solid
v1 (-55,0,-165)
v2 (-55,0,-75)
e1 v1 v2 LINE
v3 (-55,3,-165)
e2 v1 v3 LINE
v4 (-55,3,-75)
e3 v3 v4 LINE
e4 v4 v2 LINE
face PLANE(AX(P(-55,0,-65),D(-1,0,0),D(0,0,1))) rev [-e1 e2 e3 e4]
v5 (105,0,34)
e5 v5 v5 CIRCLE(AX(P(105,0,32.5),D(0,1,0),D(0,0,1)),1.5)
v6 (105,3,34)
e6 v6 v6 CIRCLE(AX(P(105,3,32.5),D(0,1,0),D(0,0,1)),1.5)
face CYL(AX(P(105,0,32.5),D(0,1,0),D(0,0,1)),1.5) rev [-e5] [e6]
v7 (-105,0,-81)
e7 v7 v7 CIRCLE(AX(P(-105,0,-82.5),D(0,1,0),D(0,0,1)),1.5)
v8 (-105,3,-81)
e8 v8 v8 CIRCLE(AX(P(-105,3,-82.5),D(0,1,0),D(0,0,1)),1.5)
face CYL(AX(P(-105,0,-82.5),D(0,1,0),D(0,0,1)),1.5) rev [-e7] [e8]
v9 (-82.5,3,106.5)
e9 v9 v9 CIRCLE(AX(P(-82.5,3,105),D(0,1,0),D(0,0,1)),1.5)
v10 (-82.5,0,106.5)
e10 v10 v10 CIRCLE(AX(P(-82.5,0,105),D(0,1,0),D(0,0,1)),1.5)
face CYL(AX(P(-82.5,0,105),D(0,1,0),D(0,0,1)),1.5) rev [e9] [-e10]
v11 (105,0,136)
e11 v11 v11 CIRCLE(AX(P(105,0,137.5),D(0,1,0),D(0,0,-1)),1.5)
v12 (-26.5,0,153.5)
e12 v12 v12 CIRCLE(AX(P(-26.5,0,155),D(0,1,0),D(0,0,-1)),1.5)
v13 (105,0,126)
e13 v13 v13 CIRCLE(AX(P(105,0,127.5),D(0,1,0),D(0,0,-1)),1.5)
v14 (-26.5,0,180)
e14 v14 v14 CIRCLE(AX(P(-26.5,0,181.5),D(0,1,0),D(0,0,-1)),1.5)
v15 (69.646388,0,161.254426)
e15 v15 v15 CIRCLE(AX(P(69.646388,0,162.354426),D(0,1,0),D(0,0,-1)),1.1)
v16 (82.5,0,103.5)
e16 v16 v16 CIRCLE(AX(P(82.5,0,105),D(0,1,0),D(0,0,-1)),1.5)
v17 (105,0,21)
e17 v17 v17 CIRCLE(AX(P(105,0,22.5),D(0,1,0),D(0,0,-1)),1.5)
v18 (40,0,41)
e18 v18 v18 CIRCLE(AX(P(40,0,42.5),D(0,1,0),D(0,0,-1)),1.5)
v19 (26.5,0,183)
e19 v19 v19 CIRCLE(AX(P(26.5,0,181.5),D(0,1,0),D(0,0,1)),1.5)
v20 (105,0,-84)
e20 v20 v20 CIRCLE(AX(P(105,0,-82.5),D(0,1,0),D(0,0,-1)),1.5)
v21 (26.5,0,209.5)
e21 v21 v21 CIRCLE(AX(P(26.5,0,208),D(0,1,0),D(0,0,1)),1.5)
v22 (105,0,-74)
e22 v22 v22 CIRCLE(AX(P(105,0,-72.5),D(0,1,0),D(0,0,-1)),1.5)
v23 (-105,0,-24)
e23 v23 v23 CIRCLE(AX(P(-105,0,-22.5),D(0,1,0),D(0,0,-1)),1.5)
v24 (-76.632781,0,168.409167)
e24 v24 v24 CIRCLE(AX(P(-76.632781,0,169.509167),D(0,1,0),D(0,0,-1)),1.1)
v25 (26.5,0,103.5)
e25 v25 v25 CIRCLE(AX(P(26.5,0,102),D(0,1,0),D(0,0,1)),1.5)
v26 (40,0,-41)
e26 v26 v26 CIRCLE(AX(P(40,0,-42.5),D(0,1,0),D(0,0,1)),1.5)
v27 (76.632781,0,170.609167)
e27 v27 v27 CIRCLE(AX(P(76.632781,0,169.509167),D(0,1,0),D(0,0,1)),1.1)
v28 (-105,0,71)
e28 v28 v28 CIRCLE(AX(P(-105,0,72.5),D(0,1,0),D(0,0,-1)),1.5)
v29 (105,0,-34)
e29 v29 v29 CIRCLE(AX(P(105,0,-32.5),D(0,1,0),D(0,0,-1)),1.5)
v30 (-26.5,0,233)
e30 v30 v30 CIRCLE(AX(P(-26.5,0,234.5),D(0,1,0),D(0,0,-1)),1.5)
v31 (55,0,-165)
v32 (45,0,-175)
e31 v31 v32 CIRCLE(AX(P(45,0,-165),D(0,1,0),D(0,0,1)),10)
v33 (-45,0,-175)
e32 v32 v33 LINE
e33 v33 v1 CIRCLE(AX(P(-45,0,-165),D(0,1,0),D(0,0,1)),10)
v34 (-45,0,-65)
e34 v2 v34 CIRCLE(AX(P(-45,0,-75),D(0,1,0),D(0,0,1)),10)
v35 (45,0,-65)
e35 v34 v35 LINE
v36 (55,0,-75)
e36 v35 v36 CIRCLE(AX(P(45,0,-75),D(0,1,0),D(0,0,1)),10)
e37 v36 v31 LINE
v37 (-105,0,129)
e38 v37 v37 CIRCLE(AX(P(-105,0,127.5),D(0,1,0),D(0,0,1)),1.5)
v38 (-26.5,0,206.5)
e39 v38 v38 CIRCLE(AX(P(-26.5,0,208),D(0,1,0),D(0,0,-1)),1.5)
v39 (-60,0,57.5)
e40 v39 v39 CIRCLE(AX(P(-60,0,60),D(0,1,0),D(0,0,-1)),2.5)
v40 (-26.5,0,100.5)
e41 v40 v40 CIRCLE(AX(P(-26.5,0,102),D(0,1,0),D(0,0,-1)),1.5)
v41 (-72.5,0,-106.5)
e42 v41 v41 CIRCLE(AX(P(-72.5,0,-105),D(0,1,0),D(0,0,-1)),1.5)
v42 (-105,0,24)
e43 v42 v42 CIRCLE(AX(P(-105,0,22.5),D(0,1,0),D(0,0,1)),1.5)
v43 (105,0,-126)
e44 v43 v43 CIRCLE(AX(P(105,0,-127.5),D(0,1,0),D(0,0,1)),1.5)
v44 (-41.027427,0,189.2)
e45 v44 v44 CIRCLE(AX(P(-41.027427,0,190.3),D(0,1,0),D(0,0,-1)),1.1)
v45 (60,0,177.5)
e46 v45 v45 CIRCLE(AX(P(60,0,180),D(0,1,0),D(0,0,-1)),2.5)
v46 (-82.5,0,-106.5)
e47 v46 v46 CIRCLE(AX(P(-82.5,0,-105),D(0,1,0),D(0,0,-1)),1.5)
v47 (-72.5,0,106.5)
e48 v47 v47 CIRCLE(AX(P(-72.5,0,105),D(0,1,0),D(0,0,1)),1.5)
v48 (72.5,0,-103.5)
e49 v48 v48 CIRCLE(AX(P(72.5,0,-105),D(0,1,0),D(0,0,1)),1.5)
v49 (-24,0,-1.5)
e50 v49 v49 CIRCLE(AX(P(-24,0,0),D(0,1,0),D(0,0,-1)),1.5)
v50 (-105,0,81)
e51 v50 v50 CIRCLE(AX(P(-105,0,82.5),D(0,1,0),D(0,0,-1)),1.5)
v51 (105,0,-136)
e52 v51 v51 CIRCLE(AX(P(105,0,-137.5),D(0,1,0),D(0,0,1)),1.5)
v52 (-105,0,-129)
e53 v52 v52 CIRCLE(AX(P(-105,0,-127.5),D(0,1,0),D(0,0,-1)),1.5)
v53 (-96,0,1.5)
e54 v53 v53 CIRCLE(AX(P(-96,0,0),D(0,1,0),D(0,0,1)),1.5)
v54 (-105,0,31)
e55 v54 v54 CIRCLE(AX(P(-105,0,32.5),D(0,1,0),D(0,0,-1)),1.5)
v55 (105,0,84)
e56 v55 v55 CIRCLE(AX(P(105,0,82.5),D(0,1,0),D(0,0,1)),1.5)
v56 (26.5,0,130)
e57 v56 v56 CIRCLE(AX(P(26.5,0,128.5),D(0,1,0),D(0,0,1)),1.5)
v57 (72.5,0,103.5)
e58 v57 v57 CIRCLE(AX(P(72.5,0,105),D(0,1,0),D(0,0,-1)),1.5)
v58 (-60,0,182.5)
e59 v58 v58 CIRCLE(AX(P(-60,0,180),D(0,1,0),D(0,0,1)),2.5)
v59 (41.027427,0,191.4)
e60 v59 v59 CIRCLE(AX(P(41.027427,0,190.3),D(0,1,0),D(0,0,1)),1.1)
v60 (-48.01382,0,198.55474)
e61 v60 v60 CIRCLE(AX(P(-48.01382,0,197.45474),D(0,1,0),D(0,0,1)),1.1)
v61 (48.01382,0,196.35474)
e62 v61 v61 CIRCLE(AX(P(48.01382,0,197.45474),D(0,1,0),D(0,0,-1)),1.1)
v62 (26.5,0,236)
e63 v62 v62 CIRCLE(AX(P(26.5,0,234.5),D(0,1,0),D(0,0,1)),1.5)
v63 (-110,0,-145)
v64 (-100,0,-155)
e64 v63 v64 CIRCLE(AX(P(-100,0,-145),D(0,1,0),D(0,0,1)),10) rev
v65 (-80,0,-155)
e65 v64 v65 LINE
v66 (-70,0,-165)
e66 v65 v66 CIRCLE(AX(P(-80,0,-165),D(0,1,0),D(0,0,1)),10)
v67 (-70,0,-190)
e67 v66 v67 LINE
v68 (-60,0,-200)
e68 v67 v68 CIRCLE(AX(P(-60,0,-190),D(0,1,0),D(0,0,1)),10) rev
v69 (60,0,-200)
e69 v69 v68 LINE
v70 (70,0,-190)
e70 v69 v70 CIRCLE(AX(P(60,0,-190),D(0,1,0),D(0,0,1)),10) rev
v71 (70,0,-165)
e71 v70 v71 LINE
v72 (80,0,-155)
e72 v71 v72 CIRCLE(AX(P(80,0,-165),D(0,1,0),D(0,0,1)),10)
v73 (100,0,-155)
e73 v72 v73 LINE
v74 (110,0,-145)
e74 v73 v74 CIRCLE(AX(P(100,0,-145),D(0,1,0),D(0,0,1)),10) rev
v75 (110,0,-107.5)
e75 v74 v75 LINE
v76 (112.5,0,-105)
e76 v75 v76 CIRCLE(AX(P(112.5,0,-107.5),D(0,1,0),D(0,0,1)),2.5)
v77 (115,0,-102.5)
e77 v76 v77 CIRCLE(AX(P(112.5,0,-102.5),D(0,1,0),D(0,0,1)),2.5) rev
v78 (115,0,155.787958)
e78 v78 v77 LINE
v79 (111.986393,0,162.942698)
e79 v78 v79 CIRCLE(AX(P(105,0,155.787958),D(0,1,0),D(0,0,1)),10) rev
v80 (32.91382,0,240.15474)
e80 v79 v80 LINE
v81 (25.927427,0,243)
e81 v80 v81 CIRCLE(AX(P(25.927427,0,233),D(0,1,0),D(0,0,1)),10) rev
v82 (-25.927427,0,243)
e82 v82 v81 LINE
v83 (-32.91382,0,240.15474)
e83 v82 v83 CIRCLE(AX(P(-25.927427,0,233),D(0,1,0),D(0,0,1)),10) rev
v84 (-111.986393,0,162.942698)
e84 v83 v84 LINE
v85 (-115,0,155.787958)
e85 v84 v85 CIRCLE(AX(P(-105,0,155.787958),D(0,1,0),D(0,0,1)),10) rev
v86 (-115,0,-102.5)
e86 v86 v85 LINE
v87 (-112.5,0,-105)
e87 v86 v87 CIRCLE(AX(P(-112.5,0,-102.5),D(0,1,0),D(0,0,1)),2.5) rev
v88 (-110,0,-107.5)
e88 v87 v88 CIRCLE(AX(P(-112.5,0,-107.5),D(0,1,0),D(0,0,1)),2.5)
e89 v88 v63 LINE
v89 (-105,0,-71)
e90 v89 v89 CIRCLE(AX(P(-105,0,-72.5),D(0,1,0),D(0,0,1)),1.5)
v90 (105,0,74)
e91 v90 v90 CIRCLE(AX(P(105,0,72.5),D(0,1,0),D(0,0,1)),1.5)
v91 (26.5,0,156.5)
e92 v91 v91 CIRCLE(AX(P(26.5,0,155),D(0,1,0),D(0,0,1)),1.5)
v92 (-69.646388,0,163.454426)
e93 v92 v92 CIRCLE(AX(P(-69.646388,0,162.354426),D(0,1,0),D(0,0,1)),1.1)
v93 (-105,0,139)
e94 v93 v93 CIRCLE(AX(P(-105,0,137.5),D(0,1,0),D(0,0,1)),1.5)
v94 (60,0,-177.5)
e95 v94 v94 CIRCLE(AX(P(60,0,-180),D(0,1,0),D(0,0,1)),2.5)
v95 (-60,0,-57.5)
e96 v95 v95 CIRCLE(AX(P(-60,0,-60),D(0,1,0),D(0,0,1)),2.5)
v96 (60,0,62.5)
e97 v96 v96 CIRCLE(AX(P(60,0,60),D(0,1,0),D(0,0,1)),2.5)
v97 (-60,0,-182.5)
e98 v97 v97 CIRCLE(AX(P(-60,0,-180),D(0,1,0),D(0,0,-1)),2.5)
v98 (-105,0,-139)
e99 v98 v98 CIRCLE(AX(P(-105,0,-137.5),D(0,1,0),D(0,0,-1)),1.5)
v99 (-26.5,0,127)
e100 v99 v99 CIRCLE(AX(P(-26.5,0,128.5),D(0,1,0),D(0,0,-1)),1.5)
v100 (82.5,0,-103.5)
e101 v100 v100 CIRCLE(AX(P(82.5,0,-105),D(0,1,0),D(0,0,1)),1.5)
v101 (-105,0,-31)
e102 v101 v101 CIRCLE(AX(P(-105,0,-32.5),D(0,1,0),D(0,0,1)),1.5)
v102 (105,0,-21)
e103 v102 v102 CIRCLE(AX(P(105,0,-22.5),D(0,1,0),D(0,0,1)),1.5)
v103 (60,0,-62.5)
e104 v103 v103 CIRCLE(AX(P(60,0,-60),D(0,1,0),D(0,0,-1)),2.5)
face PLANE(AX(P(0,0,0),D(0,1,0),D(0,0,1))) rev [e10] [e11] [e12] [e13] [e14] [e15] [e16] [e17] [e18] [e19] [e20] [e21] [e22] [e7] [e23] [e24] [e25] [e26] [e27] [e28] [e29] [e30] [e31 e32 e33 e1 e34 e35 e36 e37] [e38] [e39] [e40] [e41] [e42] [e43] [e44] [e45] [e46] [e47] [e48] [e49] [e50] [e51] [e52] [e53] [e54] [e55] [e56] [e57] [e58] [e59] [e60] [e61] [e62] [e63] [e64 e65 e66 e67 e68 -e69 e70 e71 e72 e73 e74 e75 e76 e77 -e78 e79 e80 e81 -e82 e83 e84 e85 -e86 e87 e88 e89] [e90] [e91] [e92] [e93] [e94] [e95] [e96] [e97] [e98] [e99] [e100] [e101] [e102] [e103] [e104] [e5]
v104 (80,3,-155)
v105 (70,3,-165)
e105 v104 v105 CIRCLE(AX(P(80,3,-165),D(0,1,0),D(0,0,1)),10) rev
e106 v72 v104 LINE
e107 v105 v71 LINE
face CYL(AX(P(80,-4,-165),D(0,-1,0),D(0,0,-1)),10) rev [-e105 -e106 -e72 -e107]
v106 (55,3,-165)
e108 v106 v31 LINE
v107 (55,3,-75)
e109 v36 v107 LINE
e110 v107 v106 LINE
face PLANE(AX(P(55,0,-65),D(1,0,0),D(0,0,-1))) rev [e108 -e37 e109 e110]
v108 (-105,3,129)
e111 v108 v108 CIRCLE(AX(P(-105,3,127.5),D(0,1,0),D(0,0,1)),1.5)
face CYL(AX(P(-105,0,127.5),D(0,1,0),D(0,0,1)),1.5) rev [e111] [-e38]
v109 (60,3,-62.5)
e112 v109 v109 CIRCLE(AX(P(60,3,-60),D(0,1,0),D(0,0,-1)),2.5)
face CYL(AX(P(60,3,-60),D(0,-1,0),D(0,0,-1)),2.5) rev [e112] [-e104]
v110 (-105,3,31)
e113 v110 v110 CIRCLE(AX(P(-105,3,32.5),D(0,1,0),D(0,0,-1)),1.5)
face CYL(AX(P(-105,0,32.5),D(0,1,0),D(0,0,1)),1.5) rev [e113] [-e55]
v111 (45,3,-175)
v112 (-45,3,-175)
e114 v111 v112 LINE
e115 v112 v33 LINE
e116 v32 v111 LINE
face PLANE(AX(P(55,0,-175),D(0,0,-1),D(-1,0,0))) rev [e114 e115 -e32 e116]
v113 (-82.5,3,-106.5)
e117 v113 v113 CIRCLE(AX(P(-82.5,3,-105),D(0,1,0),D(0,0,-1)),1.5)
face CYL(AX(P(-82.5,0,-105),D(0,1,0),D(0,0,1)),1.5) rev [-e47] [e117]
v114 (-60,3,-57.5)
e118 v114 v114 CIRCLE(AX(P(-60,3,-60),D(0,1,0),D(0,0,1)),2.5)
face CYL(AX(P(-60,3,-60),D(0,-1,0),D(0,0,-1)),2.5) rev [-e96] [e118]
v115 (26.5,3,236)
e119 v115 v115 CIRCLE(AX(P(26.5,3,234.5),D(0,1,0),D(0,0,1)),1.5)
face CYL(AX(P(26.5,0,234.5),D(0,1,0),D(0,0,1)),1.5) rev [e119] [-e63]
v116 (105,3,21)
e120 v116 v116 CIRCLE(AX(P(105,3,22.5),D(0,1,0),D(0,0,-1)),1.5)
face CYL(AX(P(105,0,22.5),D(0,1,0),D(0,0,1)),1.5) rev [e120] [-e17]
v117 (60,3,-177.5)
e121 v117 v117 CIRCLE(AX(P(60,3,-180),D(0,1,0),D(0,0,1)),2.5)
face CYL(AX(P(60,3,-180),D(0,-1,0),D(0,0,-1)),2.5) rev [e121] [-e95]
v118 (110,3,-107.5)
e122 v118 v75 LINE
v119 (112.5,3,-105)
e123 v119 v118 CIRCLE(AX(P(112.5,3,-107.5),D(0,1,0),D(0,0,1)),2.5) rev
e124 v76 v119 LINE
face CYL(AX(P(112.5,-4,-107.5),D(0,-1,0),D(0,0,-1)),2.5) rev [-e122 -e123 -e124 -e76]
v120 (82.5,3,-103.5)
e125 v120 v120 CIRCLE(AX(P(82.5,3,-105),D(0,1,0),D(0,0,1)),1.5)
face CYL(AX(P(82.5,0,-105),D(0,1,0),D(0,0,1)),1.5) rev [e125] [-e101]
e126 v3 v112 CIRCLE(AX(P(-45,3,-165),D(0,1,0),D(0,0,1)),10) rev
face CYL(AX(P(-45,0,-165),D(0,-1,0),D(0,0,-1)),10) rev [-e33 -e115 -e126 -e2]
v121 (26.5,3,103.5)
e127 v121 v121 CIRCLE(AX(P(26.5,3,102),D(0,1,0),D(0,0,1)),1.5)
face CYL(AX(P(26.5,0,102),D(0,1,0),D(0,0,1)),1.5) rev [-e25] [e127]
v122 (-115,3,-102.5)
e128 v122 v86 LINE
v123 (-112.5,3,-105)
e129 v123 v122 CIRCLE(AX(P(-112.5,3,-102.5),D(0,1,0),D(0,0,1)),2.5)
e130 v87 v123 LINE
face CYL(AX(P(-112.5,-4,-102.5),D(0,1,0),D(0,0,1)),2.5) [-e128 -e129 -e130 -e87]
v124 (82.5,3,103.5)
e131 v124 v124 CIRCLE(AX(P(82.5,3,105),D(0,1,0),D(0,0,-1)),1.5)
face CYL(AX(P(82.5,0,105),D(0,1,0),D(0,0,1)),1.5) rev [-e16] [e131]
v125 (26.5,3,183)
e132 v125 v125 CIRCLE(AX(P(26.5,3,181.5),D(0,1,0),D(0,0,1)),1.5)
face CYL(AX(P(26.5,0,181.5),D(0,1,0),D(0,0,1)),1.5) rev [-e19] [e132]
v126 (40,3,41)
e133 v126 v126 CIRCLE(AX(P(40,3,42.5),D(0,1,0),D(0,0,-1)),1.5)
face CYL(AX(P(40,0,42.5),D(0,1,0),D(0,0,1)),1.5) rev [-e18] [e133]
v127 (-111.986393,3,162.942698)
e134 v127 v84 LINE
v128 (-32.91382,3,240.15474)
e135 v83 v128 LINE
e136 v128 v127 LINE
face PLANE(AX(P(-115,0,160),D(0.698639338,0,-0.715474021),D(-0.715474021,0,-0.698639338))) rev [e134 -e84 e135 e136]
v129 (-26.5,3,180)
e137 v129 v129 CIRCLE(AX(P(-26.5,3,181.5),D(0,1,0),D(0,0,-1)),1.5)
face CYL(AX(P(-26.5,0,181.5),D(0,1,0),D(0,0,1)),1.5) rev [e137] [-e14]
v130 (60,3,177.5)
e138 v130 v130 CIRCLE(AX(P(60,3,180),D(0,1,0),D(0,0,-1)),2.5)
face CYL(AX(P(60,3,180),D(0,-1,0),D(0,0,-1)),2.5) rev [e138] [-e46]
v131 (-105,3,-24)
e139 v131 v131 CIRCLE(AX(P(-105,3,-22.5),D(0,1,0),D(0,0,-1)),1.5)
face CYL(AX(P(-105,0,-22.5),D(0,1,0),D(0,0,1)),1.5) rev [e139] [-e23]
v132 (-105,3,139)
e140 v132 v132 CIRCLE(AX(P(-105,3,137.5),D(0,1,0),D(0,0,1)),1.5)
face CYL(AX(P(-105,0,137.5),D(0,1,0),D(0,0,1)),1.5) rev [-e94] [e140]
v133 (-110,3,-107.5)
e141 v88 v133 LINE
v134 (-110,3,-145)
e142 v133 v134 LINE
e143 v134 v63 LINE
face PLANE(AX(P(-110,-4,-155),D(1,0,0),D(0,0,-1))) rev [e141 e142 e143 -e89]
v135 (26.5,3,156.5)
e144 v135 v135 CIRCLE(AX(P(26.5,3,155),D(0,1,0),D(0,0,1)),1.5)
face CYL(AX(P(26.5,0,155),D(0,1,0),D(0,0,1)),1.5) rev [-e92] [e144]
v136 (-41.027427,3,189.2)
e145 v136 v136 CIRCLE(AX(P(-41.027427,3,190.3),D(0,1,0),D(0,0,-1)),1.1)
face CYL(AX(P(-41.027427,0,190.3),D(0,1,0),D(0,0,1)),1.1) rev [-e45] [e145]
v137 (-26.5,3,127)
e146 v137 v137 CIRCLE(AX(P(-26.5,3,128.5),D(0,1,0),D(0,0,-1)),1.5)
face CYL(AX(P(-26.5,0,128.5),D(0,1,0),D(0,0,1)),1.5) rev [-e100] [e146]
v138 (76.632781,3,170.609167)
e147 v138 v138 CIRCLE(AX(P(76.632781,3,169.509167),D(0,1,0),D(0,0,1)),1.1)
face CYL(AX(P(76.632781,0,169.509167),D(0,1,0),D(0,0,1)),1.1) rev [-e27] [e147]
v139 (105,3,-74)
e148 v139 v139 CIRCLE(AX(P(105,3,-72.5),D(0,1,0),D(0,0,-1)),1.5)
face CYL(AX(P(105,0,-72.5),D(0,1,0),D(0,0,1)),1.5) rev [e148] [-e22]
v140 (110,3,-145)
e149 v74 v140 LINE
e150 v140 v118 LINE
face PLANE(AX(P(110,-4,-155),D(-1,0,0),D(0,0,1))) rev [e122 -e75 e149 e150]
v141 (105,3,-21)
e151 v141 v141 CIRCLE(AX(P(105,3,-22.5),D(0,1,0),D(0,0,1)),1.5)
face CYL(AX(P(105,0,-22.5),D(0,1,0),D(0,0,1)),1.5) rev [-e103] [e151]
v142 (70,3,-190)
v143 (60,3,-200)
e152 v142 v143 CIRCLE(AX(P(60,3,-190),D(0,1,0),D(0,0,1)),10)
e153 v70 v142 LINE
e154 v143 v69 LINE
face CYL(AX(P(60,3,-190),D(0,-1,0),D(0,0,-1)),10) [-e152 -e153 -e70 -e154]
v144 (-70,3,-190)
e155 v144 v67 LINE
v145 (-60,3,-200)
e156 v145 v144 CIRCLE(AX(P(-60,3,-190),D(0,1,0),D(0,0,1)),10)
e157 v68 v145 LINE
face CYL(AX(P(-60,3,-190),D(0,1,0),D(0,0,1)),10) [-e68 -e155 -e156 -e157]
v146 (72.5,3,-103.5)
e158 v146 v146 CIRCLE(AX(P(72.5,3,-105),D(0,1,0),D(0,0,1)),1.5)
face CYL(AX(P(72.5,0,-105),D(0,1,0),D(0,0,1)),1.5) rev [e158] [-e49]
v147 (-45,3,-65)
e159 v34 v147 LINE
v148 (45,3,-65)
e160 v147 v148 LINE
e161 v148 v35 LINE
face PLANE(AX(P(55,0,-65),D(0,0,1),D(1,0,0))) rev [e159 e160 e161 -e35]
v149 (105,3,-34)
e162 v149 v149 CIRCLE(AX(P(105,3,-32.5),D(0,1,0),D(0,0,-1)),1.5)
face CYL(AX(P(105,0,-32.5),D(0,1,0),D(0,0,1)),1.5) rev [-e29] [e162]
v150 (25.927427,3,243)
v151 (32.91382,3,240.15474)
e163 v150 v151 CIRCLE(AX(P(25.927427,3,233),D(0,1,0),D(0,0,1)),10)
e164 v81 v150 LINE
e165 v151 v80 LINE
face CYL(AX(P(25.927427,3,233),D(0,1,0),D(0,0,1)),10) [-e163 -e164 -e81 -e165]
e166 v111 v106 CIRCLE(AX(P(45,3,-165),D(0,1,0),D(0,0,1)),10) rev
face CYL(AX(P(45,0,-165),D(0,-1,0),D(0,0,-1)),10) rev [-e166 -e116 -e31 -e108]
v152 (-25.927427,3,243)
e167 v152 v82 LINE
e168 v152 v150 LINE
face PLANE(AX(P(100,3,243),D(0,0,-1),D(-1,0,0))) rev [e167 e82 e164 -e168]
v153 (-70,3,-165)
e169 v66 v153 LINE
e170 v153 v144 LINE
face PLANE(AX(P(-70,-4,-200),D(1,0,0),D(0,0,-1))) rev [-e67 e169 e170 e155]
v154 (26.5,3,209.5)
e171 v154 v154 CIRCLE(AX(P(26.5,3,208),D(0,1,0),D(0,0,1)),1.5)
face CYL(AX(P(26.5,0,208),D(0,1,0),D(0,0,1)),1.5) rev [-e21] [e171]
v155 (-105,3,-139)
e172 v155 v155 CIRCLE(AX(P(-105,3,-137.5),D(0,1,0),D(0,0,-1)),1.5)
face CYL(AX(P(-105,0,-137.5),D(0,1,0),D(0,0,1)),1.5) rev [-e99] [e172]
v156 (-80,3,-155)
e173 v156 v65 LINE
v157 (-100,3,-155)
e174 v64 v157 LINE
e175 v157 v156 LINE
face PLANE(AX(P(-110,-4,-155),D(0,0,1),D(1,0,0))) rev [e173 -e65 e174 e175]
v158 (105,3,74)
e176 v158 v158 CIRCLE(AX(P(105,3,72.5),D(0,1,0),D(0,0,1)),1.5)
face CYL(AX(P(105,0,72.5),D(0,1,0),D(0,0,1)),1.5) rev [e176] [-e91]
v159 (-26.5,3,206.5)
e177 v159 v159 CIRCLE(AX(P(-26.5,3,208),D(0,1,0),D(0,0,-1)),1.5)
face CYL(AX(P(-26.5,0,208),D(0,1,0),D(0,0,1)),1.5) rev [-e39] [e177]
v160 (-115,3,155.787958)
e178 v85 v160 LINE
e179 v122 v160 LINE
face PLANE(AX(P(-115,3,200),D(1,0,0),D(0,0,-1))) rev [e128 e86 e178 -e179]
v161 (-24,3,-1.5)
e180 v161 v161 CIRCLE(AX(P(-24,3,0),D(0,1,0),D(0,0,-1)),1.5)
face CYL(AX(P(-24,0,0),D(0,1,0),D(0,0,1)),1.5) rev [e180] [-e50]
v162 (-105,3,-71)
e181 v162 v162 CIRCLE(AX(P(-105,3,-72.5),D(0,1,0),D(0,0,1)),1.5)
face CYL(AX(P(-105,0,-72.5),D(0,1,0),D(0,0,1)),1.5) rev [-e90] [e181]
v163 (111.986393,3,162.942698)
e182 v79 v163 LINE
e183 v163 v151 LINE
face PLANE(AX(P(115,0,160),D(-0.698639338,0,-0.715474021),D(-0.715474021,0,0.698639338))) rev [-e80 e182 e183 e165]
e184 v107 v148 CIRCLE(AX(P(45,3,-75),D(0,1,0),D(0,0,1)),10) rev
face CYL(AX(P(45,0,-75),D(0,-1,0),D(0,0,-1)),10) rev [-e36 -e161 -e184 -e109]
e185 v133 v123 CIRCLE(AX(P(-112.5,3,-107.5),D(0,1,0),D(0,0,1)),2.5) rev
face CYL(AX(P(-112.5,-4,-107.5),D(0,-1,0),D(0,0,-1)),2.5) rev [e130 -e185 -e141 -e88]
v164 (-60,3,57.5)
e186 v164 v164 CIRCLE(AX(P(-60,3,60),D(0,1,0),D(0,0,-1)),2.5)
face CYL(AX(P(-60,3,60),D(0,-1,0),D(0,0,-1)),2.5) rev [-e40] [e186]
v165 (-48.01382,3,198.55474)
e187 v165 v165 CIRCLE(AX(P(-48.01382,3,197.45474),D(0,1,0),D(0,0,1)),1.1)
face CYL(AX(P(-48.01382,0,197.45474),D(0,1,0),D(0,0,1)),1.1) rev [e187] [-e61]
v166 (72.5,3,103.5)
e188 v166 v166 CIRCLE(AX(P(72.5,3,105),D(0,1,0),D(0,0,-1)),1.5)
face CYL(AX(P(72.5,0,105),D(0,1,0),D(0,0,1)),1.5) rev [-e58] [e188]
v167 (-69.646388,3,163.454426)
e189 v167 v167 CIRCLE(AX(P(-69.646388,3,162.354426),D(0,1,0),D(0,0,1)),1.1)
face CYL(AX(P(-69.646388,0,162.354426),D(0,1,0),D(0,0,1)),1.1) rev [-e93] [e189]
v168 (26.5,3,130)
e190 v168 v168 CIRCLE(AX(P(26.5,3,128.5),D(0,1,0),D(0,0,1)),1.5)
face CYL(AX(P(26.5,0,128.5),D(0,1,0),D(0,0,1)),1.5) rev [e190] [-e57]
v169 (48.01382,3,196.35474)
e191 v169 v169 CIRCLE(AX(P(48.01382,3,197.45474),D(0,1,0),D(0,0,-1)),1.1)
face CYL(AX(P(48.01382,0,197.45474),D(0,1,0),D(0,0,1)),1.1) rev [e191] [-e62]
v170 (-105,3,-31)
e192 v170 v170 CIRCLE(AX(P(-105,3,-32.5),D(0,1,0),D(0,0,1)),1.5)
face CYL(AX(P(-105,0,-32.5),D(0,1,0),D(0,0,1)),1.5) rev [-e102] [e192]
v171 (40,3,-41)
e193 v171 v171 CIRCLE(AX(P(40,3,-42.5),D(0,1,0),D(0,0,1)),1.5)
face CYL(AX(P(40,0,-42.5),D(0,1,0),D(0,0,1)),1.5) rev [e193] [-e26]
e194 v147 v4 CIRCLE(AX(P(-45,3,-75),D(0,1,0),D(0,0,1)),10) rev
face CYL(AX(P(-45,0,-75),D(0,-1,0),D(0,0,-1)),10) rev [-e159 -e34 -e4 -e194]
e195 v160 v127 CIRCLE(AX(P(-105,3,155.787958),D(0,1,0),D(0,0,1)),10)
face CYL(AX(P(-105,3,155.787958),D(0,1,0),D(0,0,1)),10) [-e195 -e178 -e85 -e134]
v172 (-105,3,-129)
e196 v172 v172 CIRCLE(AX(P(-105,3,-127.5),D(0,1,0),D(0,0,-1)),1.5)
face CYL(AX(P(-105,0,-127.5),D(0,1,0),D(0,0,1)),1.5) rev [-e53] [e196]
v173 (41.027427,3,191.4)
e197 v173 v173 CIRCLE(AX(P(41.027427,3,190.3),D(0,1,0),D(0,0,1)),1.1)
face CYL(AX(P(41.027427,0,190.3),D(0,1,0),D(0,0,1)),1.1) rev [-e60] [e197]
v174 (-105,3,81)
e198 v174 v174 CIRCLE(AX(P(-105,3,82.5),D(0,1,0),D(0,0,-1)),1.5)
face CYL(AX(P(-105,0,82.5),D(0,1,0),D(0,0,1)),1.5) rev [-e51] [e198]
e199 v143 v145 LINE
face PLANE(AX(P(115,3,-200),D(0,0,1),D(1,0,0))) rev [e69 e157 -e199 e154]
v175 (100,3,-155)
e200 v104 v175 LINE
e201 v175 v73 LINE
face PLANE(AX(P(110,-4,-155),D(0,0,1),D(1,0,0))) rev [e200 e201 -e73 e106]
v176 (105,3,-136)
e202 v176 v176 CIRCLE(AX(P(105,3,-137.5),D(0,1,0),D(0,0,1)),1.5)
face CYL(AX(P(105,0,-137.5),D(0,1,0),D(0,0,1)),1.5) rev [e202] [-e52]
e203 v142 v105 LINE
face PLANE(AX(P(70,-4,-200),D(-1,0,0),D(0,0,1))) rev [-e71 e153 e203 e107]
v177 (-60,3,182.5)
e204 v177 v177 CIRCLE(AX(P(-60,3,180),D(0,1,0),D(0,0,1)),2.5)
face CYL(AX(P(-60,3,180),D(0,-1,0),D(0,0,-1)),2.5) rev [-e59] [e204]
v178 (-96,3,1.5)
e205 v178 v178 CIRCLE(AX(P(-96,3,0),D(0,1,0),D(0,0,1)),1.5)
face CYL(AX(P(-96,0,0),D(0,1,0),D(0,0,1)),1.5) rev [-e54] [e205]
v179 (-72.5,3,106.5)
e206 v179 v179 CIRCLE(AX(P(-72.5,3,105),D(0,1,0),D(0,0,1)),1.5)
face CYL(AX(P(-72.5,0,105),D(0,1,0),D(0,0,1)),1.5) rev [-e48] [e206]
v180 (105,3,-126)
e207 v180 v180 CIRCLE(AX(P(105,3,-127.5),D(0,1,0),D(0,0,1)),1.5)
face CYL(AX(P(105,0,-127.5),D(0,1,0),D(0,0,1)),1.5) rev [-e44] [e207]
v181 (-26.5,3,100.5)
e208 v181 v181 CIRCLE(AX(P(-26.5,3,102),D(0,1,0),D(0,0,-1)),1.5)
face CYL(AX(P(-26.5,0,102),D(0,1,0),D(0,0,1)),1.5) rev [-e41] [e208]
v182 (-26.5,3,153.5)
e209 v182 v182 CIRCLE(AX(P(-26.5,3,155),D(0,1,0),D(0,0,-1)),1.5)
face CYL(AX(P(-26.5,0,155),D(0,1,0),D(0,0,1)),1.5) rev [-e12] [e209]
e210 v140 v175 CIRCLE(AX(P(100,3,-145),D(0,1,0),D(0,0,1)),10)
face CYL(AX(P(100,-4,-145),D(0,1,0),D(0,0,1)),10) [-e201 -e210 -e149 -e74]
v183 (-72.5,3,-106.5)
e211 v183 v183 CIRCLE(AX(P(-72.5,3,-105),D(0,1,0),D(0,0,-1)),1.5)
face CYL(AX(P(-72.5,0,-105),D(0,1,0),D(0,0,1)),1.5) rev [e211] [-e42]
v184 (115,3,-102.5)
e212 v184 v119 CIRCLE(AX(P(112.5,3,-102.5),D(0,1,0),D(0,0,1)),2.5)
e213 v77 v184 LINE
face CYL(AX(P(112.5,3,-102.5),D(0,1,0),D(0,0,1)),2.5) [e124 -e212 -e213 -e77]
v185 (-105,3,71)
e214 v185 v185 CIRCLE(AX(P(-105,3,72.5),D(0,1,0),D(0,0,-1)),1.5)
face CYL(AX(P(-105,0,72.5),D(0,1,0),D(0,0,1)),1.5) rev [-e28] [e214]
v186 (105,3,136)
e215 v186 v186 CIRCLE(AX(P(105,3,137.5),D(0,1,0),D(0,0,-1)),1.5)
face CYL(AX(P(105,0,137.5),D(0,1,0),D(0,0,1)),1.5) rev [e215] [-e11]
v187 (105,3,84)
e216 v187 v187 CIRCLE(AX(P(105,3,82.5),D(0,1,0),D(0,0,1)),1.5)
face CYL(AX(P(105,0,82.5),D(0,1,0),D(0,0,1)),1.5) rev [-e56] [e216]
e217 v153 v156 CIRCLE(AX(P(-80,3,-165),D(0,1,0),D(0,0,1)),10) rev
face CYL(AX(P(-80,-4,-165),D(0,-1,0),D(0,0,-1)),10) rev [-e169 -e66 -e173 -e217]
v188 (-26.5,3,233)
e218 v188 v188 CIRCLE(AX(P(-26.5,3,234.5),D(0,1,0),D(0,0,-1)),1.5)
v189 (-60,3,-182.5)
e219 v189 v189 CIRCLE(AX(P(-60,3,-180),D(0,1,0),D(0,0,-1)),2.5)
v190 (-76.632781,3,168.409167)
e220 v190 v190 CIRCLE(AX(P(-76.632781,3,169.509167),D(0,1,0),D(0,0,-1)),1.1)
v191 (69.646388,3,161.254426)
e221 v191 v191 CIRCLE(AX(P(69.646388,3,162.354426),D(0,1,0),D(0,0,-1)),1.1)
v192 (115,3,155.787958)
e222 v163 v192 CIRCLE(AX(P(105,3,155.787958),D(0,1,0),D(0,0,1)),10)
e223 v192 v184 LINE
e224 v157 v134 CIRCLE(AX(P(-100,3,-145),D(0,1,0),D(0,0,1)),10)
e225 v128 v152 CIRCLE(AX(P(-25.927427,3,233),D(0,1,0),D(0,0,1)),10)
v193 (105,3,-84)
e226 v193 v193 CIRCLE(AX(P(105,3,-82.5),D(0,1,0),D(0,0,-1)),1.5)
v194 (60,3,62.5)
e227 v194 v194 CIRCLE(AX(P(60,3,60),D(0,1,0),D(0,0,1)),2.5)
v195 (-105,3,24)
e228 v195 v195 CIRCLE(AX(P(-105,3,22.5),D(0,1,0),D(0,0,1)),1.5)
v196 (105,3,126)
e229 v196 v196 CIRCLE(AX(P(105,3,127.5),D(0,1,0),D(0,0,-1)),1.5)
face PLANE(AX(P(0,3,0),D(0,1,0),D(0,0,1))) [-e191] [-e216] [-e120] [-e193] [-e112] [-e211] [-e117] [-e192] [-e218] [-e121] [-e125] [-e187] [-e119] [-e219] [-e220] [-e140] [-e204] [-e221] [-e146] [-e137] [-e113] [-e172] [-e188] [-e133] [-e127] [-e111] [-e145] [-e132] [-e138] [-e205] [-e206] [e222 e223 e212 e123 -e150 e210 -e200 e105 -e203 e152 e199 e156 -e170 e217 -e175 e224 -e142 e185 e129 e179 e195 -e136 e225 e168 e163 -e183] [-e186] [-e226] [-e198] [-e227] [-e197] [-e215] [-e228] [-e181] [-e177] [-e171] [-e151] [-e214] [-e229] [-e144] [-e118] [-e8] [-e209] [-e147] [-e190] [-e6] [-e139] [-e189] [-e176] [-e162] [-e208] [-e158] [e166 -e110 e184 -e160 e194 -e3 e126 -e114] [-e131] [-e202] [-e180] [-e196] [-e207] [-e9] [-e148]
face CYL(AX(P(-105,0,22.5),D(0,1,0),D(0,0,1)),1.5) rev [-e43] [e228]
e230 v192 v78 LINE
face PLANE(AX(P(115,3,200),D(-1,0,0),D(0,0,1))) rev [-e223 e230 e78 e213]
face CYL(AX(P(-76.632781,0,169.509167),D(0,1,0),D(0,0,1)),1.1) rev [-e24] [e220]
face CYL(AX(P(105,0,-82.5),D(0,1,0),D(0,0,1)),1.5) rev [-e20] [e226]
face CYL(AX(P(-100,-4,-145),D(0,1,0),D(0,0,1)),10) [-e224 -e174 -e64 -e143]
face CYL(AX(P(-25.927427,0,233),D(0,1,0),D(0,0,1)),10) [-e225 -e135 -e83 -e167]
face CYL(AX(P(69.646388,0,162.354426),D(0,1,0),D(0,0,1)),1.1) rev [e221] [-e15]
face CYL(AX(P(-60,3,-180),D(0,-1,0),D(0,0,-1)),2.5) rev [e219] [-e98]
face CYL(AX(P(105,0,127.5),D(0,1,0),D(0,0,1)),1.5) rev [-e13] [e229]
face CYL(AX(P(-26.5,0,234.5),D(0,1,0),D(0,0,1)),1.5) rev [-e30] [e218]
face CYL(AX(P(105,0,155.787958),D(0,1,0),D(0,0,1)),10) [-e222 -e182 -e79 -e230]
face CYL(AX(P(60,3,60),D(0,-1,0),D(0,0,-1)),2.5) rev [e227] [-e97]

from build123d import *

# Parameters (mm, degrees)
SKETCH_1_W            = 230
SKETCH_1_H            = 400
SKETCH_1_R            = 2.5
EXTRUDE_1_DEPTH       = 3
SKETCH1_R             = 1.5
TOWER_HOLES_DEPTH     = 231.724944469
CUT_EXTRUDE2_DEPTH    = 7
SKETCH3_W             = 110
SKETCH3_H             = 110
CUT_EXTRUDE3_DEPTH    = 231.724944469
FILLET1_R             = 10
FILLET2_R             = 10
SKETCH4_W             = 200
SKETCH4_H             = 43
BOSS_EXTRUDE1_DEPTH   = 3
SKETCH5_R             = 1.5
CUT_EXTRUDE4_DEPTH    = 269.854979496
CUT_EXTRUDE5_DEPTH    = 269.854979496
FILLET3_R             = 10
FILLET4_R             = 2.5
SKETCH7_R             = 1.1
CUT_EXTRUDE6_DEPTH    = 269.854979496
SKETCH8_R             = 1.5
CUT_EXTRUDE7_DEPTH    = 269.854979496
SKETCH9_R             = 1.5
NUC_HOLES_DEPTH       = 269.854979496
SKETCH10_R            = 1.5
LIDAR_BOX_HOLES_DEPTH = 269.854979496


with BuildPart() as part:
    # Эскиз1 → Бобышка-Вытянуть1 (new body)
    with BuildSketch(Plane(origin=(0, 0, 0), x_dir=(1, 0, 0), z_dir=(0, 1, 0))):
        Rectangle(SKETCH_1_W, SKETCH_1_H)
        with Locations(Location((-60, -180, 0), (0, 0, 270))):
            Circle(SKETCH_1_R, mode=Mode.SUBTRACT)
        with Locations(Location((60, -180, 0), (0, 0, 90))):
            Circle(SKETCH_1_R, mode=Mode.SUBTRACT)
        with Locations(Location((60, -60, 0), (0, 0, 270))):
            Circle(SKETCH_1_R, mode=Mode.SUBTRACT)
        with Locations(Location((-60, -60, 0), (0, 0, 90))):
            Circle(SKETCH_1_R, mode=Mode.SUBTRACT)
        with Locations(Location((-60, 180, 0), (0, 0, 90))):
            Circle(SKETCH_1_R, mode=Mode.SUBTRACT)
        with Locations(Location((60, 180, 0), (0, 0, 270))):
            Circle(SKETCH_1_R, mode=Mode.SUBTRACT)
        with Locations(Location((60, 60, 0), (0, 0, 90))):
            Circle(SKETCH_1_R, mode=Mode.SUBTRACT)
        with Locations(Location((-60, 60, 0), (0, 0, 270))):
            Circle(SKETCH_1_R, mode=Mode.SUBTRACT)
    extrude(amount=EXTRUDE_1_DEPTH)

    # Sketch1 → Tower holes (cut, through all)
    with BuildSketch(Plane(origin=(0, 3, 0), x_dir=(1, 0, 0), z_dir=(0, 1, 0))):
        with Locations(Location((-105, 82.5, 0), (0, 0, 270))):
            Circle(SKETCH1_R)
        with Locations(Location((-105, 72.5, 0), (0, 0, 270))):
            Circle(SKETCH1_R)
        with Locations(Location((-82.5, 105, 0), (0, 0, 90))):
            Circle(SKETCH1_R)
        with Locations(Location((-72.5, 105, 0), (0, 0, 90))):
            Circle(SKETCH1_R)
        with Locations(Location((82.5, 105, 0), (0, 0, 270))):
            Circle(SKETCH1_R)
        with Locations(Location((72.5, 105, 0), (0, 0, 270))):
            Circle(SKETCH1_R)
        with Locations(Location((105, 82.5, 0), (0, 0, 90))):
            Circle(SKETCH1_R)
        with Locations(Location((105, 72.5, 0), (0, 0, 90))):
            Circle(SKETCH1_R)
        with Locations(Location((105, -82.5, 0), (0, 0, 270))):
            Circle(SKETCH1_R)
        with Locations(Location((105, -72.5, 0), (0, 0, 270))):
            Circle(SKETCH1_R)
        with Locations(Location((82.5, -105, 0), (0, 0, 90))):
            Circle(SKETCH1_R)
        with Locations(Location((72.5, -105, 0), (0, 0, 90))):
            Circle(SKETCH1_R)
        with Locations(Location((-82.5, -105, 0), (0, 0, 270))):
            Circle(SKETCH1_R)
        with Locations(Location((-72.5, -105, 0), (0, 0, 270))):
            Circle(SKETCH1_R)
        with Locations(Location((-105, -82.5, 0), (0, 0, 90))):
            Circle(SKETCH1_R)
        with Locations(Location((-105, -72.5, 0), (0, 0, 90))):
            Circle(SKETCH1_R)
        with Locations(Location((-105, 137.5, 0), (0, 0, 90))):
            Circle(SKETCH1_R)
        with Locations(Location((-105, 127.5, 0), (0, 0, 90))):
            Circle(SKETCH1_R)
        with Locations(Location((105, 127.5, 0), (0, 0, 270))):
            Circle(SKETCH1_R)
        with Locations(Location((105, 137.5, 0), (0, 0, 270))):
            Circle(SKETCH1_R)
        with Locations(Location((105, -127.5, 0), (0, 0, 90))):
            Circle(SKETCH1_R)
        with Locations(Location((105, -137.5, 0), (0, 0, 90))):
            Circle(SKETCH1_R)
        with Locations(Location((-105, -127.5, 0), (0, 0, 270))):
            Circle(SKETCH1_R)
        with Locations(Location((-105, -137.5, 0), (0, 0, 270))):
            Circle(SKETCH1_R)
    extrude(amount=-TOWER_HOLES_DEPTH, mode=Mode.SUBTRACT)

    # Sketch2 → Cut-Extrude2 (cut)
    with BuildSketch(Plane(origin=(0, 3, 0), x_dir=(1, 0, 0), z_dir=(0, 1, 0))):
        Polygon((-115, 200), (-70, 200), (-70, 155), (-110, 155), (-110, 105), (-115, 105), (-115, 155), align=None)
        Polygon((70, 200), (70, 155), (110, 155), (110, 105), (115, 105), (115, 155), (115, 200), align=None)
    extrude(amount=-CUT_EXTRUDE2_DEPTH, mode=Mode.SUBTRACT)

    # Sketch3 → Cut-Extrude3 (cut, through all)
    with BuildSketch(Plane(origin=(0, 3, 0), x_dir=(1, 0, 0), z_dir=(0, 1, 0))):
        with Locations((0, 120)):
            Rectangle(SKETCH3_W, SKETCH3_H)
    extrude(amount=-CUT_EXTRUDE3_DEPTH, mode=Mode.SUBTRACT)

    # Fillet1
    fillet1_edges = [part.edges().sort_by_distance(p)[0] for p in [
        (-55, 1.5, -65),
        (-55, 1.5, -175),
        (55, 1.5, -175),
        (55, 1.5, -65),
    ]]
    fillet(fillet1_edges, radius=FILLET1_R)

    # Fillet2
    fillet2_edges = [part.edges().sort_by_distance(p)[0] for p in [
        (70, 1.5, -200),
        (-70, 1.5, -200),
        (-70, 1.5, -155),
        (-110, 1.5, -155),
        (110, 1.5, -155),
        (70, 1.5, -155),
    ]]
    fillet(fillet2_edges, radius=FILLET2_R)

    # Sketch4 → Boss-Extrude1 (add)
    with BuildSketch(Plane(origin=(0, 0, 0), x_dir=(1, 0, 0), z_dir=(0, 1, 0))):
        with Locations((0, -221.5)):
            Rectangle(SKETCH4_W, SKETCH4_H)
    extrude(amount=BOSS_EXTRUDE1_DEPTH)

    # Sketch5 → Cut-Extrude4 (cut, through all)
    with BuildSketch(Plane(origin=(0, 3, 0), x_dir=(1, 0, 0), z_dir=(0, 1, 0))):
        with Locations(Location((26.5, -208, 0), (0, 0, 270))):
            Circle(SKETCH5_R)
        with Locations(Location((-26.5, -208, 0), (0, 0, 90))):
            Circle(SKETCH5_R)
        with Locations(Location((26.5, -234.5, 0), (0, 0, 270))):
            Circle(SKETCH5_R)
        with Locations(Location((-26.5, -234.5, 0), (0, 0, 90))):
            Circle(SKETCH5_R)
        with Locations(Location((26.5, -181.5, 0), (0, 0, 270))):
            Circle(SKETCH5_R)
        with Locations(Location((-26.5, -181.5, 0), (0, 0, 90))):
            Circle(SKETCH5_R)
        with Locations(Location((26.5, -155, 0), (0, 0, 270))):
            Circle(SKETCH5_R)
        with Locations(Location((-26.5, -155, 0), (0, 0, 90))):
            Circle(SKETCH5_R)
        with Locations(Location((26.5, -128.5, 0), (0, 0, 270))):
            Circle(SKETCH5_R)
        with Locations(Location((-26.5, -128.5, 0), (0, 0, 90))):
            Circle(SKETCH5_R)
        with Locations(Location((26.5, -102, 0), (0, 0, 270))):
            Circle(SKETCH5_R)
        with Locations(Location((-26.5, -102, 0), (0, 0, 90))):
            Circle(SKETCH5_R)
    extrude(amount=-CUT_EXTRUDE4_DEPTH, mode=Mode.SUBTRACT)

    # Sketch6 → Cut-Extrude5 (cut, through all)
    with BuildSketch(Plane(origin=(0, 3, 0), x_dir=(1, 0, 0), z_dir=(0, 1, 0))):
        Polygon((115, -160), (30, -243), (115, -243), align=None)
        Polygon((-115, -160), (-30, -243), (-115, -243), align=None)
    extrude(amount=-CUT_EXTRUDE5_DEPTH, mode=Mode.SUBTRACT)

    # Fillet3
    fillet3_edges = [part.edges().sort_by_distance(p)[0] for p in [
        (115, 1.5, 160),
        (30, 1.5, 243),
        (-30, 1.5, 243),
        (-115, 1.5, 160),
    ]]
    fillet(fillet3_edges, radius=FILLET3_R)

    # Fillet4
    fillet4_edges = [part.edges().sort_by_distance(p)[0] for p in [
        (110, 1.5, -105),
        (-110, 1.5, -105),
    ]]
    fillet(fillet4_edges, radius=FILLET4_R)
    fillet4_2_edges = [part.edges().sort_by_distance(p)[0] for p in [
        (115, 1.5, -105),
        (-115, 1.5, -105),
    ]]
    fillet(fillet4_2_edges, radius=FILLET4_R - 0.0001)  # a hair under: the kernel refuses the full size

    # Sketch7 → Cut-Extrude6 (cut, through all)
    with BuildSketch(Plane(origin=(0, 3, 0), x_dir=(1, 0, 0), z_dir=(0, 1, 0))):
        with Locations(Location((41.027426882, -190.3, 0), (0, 0, 270))):
            Circle(SKETCH7_R)
        with Locations(Location((48.013820265, -197.454740212, 0), (0, 0, 90))):
            Circle(SKETCH7_R)
        with Locations(Location((76.632781112, -169.509166679, 0), (0, 0, 270))):
            Circle(SKETCH7_R)
        with Locations(Location((69.646387729, -162.354426467, 0), (0, 0, 90))):
            Circle(SKETCH7_R)
        with Locations(Location((-69.646387729, -162.354426467, 0), (0, 0, 270))):
            Circle(SKETCH7_R)
        with Locations(Location((-76.632781112, -169.509166679, 0), (0, 0, 90))):
            Circle(SKETCH7_R)
        with Locations(Location((-48.013820265, -197.454740212, 0), (0, 0, 270))):
            Circle(SKETCH7_R)
        with Locations(Location((-41.027426882, -190.3, 0), (0, 0, 90))):
            Circle(SKETCH7_R)
    extrude(amount=-CUT_EXTRUDE6_DEPTH, mode=Mode.SUBTRACT)

    # Sketch8 → Cut-Extrude7 (cut, through all)
    with BuildSketch(Plane(origin=(0, 3, 0), x_dir=(1, 0, 0), z_dir=(0, 1, 0))):
        with Locations(Location((105, -32.5, 0), (0, 0, 270))):
            Circle(SKETCH8_R)
        with Locations(Location((105, -22.5, 0), (0, 0, 90))):
            Circle(SKETCH8_R)
        with Locations(Location((105, 22.5, 0), (0, 0, 270))):
            Circle(SKETCH8_R)
        with Locations(Location((105, 32.5, 0), (0, 0, 90))):
            Circle(SKETCH8_R)
        with Locations(Location((-105, 32.5, 0), (0, 0, 270))):
            Circle(SKETCH8_R)
        with Locations(Location((-105, 22.5, 0), (0, 0, 90))):
            Circle(SKETCH8_R)
        with Locations(Location((-105, -22.5, 0), (0, 0, 270))):
            Circle(SKETCH8_R)
        with Locations(Location((-105, -32.5, 0), (0, 0, 90))):
            Circle(SKETCH8_R)
    extrude(amount=-CUT_EXTRUDE7_DEPTH, mode=Mode.SUBTRACT)

    # Sketch9 → NUC holes (cut, through all)
    with BuildSketch(Plane(origin=(0, 3, 0), x_dir=(1, 0, 0), z_dir=(0, 1, 0))):
        with Locations(Location((40, 42.5, 0), (0, 0, 270))):
            Circle(SKETCH9_R)
        with Locations(Location((40, -42.5, 0), (0, 0, 90))):
            Circle(SKETCH9_R)
    extrude(amount=-NUC_HOLES_DEPTH, mode=Mode.SUBTRACT)

    # Sketch10 → Lidar box holes (cut, through all)
    with BuildSketch(Plane(origin=(0, 3, 0), x_dir=(1, 0, 0), z_dir=(0, 1, 0))):
        with Locations(Location((-96, 0, 0), (0, 0, 270))):
            Circle(SKETCH10_R)
        with Locations(Location((-24, 0, 0), (0, 0, 90))):
            Circle(SKETCH10_R)
    extrude(amount=-LIDAR_BOX_HOLES_DEPTH, mode=Mode.SUBTRACT)


solid = part.part
